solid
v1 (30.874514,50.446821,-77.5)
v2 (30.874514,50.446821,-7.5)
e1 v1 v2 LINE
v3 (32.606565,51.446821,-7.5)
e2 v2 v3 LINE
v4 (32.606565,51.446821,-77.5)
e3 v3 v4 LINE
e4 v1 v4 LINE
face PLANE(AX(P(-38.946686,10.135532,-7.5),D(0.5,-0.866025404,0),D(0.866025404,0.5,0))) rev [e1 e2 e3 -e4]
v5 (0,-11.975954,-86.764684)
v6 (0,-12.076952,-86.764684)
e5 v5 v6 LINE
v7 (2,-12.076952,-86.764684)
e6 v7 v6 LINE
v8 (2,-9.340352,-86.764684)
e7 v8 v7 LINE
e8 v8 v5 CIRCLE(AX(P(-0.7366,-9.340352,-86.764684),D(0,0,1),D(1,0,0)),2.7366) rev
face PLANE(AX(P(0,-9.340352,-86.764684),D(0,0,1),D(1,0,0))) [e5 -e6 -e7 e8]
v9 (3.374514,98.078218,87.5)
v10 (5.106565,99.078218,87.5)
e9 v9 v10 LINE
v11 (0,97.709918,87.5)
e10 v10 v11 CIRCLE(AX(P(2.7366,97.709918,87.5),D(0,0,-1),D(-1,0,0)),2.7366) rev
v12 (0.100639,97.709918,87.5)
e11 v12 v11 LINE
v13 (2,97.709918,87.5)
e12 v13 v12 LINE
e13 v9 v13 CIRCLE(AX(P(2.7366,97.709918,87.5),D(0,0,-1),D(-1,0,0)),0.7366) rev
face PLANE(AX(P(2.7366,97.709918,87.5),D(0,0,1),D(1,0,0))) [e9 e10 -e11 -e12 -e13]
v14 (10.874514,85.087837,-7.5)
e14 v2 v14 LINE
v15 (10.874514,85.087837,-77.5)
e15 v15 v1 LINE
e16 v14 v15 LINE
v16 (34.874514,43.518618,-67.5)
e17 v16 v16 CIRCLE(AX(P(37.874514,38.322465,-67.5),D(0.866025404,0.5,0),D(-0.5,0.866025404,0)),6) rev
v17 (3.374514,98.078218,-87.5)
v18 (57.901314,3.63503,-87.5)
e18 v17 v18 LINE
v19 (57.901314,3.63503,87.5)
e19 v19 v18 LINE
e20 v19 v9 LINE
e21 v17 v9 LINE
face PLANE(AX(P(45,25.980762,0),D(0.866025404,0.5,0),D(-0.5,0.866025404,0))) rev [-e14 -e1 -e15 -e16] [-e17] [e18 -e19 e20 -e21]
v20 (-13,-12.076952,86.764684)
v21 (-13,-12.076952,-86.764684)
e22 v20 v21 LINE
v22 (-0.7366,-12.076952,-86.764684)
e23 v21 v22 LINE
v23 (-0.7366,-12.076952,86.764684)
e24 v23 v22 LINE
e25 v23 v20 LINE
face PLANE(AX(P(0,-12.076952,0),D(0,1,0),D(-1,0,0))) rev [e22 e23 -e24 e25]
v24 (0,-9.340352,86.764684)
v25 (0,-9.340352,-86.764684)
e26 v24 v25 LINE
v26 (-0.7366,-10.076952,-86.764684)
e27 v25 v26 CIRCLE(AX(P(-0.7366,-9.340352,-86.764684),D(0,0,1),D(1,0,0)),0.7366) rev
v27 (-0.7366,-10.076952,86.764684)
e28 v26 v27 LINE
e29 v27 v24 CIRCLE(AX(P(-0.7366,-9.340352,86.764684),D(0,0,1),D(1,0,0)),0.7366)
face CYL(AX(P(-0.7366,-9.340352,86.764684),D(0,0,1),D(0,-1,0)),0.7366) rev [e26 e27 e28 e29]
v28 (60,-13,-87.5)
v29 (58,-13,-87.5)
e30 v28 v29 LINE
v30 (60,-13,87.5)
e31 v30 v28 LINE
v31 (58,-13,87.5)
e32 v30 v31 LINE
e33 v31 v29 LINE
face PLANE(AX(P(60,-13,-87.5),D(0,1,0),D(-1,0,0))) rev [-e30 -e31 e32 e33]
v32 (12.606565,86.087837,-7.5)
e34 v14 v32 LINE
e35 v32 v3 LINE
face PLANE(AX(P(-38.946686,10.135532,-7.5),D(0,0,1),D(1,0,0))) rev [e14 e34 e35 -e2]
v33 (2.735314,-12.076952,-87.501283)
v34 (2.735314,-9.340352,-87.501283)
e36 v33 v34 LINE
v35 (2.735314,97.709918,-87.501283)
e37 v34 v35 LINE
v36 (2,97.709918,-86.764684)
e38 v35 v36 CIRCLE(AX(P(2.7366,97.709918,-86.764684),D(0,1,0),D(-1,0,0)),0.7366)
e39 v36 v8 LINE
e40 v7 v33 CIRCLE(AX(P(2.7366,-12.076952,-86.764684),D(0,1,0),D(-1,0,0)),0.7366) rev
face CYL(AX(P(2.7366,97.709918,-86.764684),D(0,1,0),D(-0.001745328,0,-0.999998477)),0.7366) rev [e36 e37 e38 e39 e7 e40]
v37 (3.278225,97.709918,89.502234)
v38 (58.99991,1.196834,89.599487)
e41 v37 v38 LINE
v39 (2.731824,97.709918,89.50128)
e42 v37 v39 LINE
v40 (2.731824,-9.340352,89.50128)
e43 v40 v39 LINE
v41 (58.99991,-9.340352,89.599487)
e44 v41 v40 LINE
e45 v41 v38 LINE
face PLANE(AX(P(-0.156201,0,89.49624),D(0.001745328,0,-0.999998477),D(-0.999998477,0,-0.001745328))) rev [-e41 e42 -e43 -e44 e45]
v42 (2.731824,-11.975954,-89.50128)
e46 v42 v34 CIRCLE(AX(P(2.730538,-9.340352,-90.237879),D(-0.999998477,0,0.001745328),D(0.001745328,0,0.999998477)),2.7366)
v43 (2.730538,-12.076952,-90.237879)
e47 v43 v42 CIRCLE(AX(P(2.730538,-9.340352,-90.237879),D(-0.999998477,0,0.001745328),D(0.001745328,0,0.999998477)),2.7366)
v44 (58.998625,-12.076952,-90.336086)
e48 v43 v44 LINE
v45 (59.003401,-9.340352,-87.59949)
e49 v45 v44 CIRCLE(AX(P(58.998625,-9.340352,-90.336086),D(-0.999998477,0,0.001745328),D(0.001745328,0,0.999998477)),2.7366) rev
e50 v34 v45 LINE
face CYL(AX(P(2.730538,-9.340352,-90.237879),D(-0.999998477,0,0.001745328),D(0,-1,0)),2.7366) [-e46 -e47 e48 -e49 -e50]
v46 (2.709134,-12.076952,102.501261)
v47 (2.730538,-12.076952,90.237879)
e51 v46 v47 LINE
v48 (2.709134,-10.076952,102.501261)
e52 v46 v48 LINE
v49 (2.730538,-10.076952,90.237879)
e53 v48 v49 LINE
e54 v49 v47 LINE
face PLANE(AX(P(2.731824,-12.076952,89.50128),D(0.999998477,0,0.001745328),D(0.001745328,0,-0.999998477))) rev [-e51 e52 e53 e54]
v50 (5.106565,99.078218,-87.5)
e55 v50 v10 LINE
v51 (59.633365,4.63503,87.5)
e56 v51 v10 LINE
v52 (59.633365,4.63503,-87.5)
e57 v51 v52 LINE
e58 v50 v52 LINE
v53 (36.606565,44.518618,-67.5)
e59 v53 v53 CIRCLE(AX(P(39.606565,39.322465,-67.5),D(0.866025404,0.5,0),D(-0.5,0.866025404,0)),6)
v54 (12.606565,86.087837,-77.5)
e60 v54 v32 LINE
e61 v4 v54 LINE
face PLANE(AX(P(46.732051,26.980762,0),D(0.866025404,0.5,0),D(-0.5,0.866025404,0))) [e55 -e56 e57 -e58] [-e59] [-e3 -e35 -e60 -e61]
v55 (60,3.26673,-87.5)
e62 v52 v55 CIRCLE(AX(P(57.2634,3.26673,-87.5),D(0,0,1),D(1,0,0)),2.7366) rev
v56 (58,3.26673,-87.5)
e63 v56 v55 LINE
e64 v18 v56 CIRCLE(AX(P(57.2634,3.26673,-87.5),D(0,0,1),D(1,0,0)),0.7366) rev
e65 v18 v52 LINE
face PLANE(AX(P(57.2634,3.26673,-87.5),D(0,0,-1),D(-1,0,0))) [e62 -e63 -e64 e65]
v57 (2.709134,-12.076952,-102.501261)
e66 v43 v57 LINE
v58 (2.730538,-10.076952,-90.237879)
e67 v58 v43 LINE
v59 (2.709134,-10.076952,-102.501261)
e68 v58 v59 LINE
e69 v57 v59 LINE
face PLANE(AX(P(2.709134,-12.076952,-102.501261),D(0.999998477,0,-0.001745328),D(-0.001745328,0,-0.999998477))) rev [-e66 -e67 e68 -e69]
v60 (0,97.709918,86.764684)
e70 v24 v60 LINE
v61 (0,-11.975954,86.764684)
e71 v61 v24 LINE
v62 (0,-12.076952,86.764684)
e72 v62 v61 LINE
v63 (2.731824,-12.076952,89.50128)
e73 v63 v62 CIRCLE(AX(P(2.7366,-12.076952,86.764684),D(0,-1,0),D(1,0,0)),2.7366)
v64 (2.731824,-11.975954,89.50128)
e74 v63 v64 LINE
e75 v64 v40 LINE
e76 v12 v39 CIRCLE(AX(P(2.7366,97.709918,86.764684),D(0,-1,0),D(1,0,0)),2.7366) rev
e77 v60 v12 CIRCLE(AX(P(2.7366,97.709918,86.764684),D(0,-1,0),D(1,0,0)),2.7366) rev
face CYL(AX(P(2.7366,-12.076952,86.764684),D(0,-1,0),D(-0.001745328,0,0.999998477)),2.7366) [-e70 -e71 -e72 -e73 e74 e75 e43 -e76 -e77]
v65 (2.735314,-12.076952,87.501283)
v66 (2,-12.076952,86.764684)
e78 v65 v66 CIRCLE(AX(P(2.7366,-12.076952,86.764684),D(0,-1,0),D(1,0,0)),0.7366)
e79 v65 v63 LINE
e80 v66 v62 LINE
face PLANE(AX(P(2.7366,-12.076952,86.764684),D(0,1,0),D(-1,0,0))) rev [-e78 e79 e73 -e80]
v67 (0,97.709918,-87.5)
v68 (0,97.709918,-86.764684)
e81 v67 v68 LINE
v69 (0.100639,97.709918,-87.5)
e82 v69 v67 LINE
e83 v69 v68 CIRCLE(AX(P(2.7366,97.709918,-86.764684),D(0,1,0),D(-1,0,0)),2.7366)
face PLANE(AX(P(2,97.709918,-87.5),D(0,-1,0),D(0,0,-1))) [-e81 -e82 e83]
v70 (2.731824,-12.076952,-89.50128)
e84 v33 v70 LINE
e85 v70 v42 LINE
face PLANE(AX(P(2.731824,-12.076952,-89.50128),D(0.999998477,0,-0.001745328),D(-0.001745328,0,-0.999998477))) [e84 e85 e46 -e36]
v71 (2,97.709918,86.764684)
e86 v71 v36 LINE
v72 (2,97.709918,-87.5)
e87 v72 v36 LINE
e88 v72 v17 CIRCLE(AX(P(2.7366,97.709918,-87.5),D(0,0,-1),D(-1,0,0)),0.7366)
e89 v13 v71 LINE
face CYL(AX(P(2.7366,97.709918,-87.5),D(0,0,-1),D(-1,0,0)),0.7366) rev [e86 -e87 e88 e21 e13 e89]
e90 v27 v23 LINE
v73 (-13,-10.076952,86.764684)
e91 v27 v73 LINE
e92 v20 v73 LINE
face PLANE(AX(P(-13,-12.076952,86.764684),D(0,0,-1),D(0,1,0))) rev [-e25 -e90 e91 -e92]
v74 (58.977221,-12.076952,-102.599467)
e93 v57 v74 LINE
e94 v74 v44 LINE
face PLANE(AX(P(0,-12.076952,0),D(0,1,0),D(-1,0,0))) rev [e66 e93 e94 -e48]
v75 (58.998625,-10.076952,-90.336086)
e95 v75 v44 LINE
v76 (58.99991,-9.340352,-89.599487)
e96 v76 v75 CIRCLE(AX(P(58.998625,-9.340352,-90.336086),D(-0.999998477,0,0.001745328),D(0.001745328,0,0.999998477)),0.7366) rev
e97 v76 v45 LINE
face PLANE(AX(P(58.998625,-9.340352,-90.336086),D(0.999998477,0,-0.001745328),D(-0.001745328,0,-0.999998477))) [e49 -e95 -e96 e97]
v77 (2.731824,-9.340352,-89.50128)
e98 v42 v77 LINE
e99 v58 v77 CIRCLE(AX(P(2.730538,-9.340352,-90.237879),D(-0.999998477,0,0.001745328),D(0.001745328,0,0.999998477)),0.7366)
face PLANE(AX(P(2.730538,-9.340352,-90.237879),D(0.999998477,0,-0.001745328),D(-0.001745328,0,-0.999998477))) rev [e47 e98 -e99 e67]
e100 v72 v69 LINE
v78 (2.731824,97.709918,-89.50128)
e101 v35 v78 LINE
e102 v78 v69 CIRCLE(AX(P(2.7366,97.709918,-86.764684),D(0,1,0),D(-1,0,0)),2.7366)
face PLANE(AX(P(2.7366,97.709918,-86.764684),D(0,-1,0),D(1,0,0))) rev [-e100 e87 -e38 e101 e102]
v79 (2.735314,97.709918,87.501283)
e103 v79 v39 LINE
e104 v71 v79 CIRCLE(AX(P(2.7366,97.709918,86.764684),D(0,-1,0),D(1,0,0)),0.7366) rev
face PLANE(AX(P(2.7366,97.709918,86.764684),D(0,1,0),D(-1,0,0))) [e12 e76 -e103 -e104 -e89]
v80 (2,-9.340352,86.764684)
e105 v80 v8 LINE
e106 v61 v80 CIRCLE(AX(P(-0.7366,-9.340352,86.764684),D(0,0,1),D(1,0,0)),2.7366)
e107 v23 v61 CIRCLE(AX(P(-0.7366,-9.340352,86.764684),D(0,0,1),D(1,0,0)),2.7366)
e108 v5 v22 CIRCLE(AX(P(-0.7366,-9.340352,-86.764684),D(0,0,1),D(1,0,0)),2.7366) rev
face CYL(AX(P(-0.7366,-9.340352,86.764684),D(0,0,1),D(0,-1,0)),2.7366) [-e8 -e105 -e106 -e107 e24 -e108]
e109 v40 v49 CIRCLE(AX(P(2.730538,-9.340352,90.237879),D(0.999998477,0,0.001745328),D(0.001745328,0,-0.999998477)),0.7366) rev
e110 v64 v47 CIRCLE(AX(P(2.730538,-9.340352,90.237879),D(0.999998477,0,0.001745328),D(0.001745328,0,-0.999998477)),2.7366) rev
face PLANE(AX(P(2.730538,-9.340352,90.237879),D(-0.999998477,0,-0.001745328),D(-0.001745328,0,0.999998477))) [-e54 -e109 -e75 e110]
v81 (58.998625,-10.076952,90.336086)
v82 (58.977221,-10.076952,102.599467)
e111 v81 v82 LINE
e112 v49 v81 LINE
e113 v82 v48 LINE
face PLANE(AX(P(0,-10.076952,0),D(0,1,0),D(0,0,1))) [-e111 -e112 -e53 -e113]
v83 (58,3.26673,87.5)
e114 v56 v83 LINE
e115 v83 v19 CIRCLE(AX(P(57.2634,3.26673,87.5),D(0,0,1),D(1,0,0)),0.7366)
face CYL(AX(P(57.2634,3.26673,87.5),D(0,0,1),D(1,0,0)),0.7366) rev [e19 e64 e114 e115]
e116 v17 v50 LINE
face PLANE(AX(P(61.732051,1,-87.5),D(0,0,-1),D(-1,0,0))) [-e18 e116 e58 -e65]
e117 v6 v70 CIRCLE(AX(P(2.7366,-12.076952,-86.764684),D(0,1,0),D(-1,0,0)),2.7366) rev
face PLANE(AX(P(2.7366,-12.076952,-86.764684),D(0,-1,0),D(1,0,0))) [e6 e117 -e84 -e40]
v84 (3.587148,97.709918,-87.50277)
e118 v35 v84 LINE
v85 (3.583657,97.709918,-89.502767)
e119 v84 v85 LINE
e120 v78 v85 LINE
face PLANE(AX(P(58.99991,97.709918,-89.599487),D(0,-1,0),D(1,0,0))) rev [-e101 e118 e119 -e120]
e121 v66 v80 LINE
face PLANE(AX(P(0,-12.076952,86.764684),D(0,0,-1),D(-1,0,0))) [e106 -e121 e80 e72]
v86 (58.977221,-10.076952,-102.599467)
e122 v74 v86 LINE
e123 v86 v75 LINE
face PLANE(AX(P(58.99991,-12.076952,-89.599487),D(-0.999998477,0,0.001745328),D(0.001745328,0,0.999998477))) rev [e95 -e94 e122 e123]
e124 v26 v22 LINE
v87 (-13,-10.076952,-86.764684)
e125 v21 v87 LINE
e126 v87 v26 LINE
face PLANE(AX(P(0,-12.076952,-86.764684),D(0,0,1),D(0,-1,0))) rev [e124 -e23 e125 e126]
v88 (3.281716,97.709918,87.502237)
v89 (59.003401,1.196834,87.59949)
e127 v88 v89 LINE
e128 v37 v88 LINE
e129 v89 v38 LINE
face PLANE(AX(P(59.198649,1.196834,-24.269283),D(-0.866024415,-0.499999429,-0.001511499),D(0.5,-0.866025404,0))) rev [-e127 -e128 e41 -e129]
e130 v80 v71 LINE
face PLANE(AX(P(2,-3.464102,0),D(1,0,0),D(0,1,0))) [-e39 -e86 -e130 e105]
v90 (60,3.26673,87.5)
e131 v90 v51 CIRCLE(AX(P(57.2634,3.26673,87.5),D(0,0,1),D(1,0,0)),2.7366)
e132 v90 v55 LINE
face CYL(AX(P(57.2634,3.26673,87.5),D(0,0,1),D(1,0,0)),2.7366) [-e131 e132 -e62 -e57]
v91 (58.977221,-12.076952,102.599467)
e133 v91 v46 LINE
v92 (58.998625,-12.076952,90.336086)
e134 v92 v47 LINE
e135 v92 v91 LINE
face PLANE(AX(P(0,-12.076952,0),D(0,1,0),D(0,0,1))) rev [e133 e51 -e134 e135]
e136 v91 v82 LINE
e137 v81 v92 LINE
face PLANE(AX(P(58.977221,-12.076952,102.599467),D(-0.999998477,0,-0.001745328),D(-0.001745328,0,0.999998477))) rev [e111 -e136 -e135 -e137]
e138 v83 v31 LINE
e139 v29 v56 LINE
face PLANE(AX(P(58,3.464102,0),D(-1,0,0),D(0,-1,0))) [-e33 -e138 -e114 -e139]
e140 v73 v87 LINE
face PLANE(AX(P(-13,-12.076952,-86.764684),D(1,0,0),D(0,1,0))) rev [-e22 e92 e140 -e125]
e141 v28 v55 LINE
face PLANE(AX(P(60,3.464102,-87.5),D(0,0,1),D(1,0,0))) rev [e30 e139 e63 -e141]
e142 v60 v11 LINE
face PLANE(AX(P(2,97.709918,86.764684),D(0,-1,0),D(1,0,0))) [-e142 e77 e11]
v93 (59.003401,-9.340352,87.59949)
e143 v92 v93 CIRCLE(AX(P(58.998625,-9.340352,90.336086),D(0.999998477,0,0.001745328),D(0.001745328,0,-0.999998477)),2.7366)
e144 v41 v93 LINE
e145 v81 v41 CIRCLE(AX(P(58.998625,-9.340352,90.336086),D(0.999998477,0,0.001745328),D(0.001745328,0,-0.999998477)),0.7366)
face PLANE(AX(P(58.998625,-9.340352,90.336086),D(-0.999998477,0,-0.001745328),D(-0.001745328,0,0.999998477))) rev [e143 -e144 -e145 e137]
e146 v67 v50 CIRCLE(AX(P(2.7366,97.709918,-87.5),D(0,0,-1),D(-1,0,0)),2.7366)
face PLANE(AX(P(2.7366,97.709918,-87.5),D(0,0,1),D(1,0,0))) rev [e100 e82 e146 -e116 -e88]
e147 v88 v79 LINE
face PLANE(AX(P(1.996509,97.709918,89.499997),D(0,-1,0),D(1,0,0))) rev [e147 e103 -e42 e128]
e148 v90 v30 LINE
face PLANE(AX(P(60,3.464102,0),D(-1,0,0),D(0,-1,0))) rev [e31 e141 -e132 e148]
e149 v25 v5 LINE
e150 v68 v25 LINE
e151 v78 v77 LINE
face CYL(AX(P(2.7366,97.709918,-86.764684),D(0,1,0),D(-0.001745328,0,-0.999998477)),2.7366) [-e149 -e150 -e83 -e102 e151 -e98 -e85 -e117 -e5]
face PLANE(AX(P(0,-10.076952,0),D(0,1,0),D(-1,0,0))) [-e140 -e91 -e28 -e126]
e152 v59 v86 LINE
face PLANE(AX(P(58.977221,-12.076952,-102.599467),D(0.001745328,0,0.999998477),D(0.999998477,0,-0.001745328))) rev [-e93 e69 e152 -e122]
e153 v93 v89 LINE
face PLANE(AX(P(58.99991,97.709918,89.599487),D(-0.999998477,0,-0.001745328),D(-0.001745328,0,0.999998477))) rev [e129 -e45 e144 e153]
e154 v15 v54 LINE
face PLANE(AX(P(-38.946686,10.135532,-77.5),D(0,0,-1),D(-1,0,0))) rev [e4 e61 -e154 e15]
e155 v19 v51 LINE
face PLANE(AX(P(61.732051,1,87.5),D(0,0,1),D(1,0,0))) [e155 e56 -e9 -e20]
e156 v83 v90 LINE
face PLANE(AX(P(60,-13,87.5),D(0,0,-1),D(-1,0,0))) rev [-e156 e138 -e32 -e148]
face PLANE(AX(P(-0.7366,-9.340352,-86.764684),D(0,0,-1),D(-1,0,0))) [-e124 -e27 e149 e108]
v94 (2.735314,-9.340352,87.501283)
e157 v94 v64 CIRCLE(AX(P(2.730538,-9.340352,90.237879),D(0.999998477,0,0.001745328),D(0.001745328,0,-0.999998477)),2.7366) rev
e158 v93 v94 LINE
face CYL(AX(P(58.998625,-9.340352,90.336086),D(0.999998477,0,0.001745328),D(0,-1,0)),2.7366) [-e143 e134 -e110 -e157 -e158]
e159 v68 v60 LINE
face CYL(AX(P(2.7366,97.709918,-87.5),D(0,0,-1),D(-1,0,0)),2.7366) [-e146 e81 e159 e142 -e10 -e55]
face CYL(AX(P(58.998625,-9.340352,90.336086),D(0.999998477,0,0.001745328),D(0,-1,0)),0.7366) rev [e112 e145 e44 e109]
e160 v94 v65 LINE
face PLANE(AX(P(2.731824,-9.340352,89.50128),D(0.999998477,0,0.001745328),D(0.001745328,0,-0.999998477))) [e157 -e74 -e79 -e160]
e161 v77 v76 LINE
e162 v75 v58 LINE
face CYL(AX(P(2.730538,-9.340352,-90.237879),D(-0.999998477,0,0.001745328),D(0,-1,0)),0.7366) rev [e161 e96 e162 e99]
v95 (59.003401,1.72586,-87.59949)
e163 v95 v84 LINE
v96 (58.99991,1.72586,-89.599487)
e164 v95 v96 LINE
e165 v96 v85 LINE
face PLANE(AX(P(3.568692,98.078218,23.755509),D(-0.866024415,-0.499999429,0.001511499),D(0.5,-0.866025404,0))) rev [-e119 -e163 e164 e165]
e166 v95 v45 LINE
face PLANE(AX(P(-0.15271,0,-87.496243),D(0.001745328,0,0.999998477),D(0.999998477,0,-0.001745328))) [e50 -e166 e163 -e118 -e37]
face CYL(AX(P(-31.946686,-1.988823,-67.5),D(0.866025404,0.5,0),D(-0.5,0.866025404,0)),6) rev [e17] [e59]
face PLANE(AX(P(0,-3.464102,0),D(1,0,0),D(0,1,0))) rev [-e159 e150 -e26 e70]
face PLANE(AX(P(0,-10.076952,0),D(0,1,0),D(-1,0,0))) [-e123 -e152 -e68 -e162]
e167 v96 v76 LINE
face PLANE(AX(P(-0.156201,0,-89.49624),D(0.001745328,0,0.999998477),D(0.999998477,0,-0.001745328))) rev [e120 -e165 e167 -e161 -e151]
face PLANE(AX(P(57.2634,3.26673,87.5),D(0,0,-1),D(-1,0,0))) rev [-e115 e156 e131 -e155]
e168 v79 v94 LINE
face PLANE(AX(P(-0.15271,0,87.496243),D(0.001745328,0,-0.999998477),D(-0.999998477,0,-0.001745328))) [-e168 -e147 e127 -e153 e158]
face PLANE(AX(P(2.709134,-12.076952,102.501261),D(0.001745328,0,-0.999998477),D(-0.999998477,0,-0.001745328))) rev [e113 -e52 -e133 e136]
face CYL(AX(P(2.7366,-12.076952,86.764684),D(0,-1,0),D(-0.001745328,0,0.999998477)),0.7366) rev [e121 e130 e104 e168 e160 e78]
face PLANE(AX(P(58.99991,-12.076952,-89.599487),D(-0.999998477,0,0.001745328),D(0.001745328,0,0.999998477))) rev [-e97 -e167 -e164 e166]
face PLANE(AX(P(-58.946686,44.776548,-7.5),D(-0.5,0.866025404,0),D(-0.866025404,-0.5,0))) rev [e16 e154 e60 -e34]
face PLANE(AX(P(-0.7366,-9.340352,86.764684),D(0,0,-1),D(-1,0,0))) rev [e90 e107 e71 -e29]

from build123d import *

# Parameters (mm, degrees)
CROQUIS3_W                         = 120
CROQUIS3_H                         = 175
BRIDA_BASE1_DEPTH                  = 2
BRIDA_START                        = -87.5
BRIDA_DE_ARISTA1_DEPTH             = 175
BRIDA_DE_ARISTA1_2_DEPTH           = 175
BRIDA_DE_ARISTA2_DEPTH             = 175
BRIDA_DE_ARISTA2_2_DEPTH           = 175
BRIDA_DE_ARISTA3_STRIP_CUT_DEPTH   = 109.78686976
BRIDA_DE_ARISTA3_STRIP_CUT_2_DEPTH = 109.78686976
BRIDA_DE_ARISTA3_DEPTH             = 109.78686976
BRIDA_DE_ARISTA3_BEND_DEPTH        = 109.78686976
CORTAR_EXTRUIR5_DEPTH              = 2
CORTAR_EXTRUIR6_DEPTH              = 2
BRIDA_DE_ARISTA4_STRIP_W           = 9.4732
BRIDA_DE_ARISTA4_STRIP_H           = 2
BRIDA_DE_ARISTA4_STRIP_CUT_DEPTH   = 56.268172105
BRIDA_DE_ARISTA4_STRIP_2_W         = 9.4732
BRIDA_DE_ARISTA4_STRIP_2_H         = 2
BRIDA_DE_ARISTA4_STRIP_CUT_2_DEPTH = 173.529368978
BRIDA_DE_ARISTA4_STRIP_3_W         = 9.4732
BRIDA_DE_ARISTA4_STRIP_3_H         = 2
BRIDA_DE_ARISTA4_STRIP_CUT_3_DEPTH = 56.268172105
BRIDA_DE_ARISTA4_DEPTH             = 56.268172105
BRIDA_DE_ARISTA4_BEND_DEPTH        = 173.529368978
BRIDA_DE_ARISTA4_BEND_2_DEPTH      = 56.268172105
CROQUIS37_R                        = 6
CROQUIS37_W                        = 70
CROQUIS37_H                        = 40
CORTAR_EXTRUIR7_DEPTH              = 2


# Read off the part's stored shape, not the designer's step: Brida de arista1, Brida de arista2
# Sheet-metal steps are written as plain solids
with BuildPart() as part:
    # Croquis3 → Brida base1 (new body)
    with BuildSketch(Plane(origin=(45, 25.980762114, 0), x_dir=(0.5000000000000044, -0.8660254037844362, 0), z_dir=(-0.8660254037844362, -0.5000000000000044, 0))):
        with Locations((-30, 0)):
            Rectangle(CROQUIS3_W, CROQUIS3_H)
    extrude(amount=-BRIDA_BASE1_DEPTH)

    # Brida de arista1 outline → Brida de arista1 (cut)
    with BuildSketch(Plane.XY.offset(BRIDA_START)):
        with BuildLine():
            Line((0, 103.923048454), (2.056713114, 100.360716845))
            ThreePointArc((2.056713114, 100.360716845), (3.797397716, 100.232553298), (5.10656512, 99.078218214))
            Line((5.10656512, 99.078218214), (1.732050808, 104.923048454))
            Line((1.732050808, 104.923048454), (0, 103.923048454))
        make_face()
    extrude(amount=BRIDA_DE_ARISTA1_DEPTH, mode=Mode.SUBTRACT)

    # Brida de arista1 2 outline → Brida de arista1 2 (add)
    with BuildSketch(Plane.XY.offset(BRIDA_START)):
        with BuildLine():
            ThreePointArc((2.056713114, 100.360716845), (0.574476274, 99.387476127), (0, 97.709918214))
            Line((0, 97.709918214), (0, -12.076951546))
            Line((0, -12.076951546), (2, -12.076951546))
            Line((2, -12.076951546), (2, 97.709918214))
            ThreePointArc((2, 97.709918214), (2.545953891, 98.421419178), (3.374514312, 98.078218214))
            Line((3.374514312, 98.078218214), (2.056713114, 100.360716845))
        make_face()
    extrude(amount=BRIDA_DE_ARISTA1_2_DEPTH)

    # Brida de arista2 outline → Brida de arista2 (cut)
    with BuildSketch(Plane.XY.offset(BRIDA_START)):
        with BuildLine():
            ThreePointArc((59.63336512, 4.63503024), (59.906752616, 3.975014439), (60, 3.26673024))
            Line((60, 3.26673024), (60, 0))
            Line((60, 0), (61.732050808, 1))
            Line((61.732050808, 1), (59.63336512, 4.63503024))
        make_face()
    extrude(amount=BRIDA_DE_ARISTA2_DEPTH, mode=Mode.SUBTRACT)

    # Brida de arista2 2 outline → Brida de arista2 2 (add)
    with BuildSketch(Plane.XY.offset(BRIDA_START)):
        with BuildLine():
            Line((60, -13), (60, 0))
            Line((60, 0), (57.901314312, 3.63503024))
            ThreePointArc((57.901314312, 3.63503024), (57.974900964, 3.457376349), (58, 3.26673024))
            Line((58, 3.26673024), (58, -13))
            Line((58, -13), (60, -13))
        make_face()
    extrude(amount=BRIDA_DE_ARISTA2_2_DEPTH)

    # Brida de arista3 strip (across the edge) → Brida de arista3 strip cut (cut)
    with BuildSketch(Plane(origin=(2, -12.076951546, -87.5), x_dir=(0.0017453283659016917, 0, 0.9999984769132877), z_dir=(0, 1, 0))):
        Polygon((-8.741361837, -1.984746476), (0.731823734, -2.001280321), (0.735314391, -0.001283367), (-8.73787118, 0.015250478), align=None)
    extrude(amount=BRIDA_DE_ARISTA3_STRIP_CUT_DEPTH, mode=Mode.SUBTRACT)

    # Brida de arista3 strip 2 (across the edge) → Brida de arista3 strip cut 2 (cut)
    with BuildSketch(Plane(origin=(2, 97.709918214, 87.5), x_dir=(0.0017453283659016917, 0, -0.9999984769132877), z_dir=(0, -1, 0))):
        Polygon((-8.741361837, -1.984746476), (0.731823734, -2.001280321), (0.735314391, -0.001283367), (-8.73787118, 0.015250478), align=None)
    extrude(amount=BRIDA_DE_ARISTA3_STRIP_CUT_2_DEPTH, mode=Mode.SUBTRACT)

    # Brida de arista3 section (across the edge) → Brida de arista3 (add)
    with BuildSketch(Plane(origin=(2, -12.076951546, -87.5), x_dir=(0.0017453283659016917, 0, 0.9999984769132877), z_dir=(0, 1, 0))):
        with BuildLine():
            Line((-2, 0.735315511), (-2, 57.003487616))
            Line((-2, 57.003487616), (0, 57.003487616))
            Line((0, 57.003487616), (0, 0.735315511))
            ThreePointArc((0, 0.735315511), (0.215290812, 0.214915386), (0.735314391, -0.001283367))
            Line((0.735314391, -0.001283367), (0.731823734, -2.001280321))
            ThreePointArc((0.731823734, -2.001280321), (-1.200156346, -1.198063504), (-2, 0.735315511))
        make_face()
    extrude(amount=BRIDA_DE_ARISTA3_DEPTH)

    # Brida de arista3 section 2 (across the edge) → Brida de arista3 bend (add)
    with BuildSketch(Plane(origin=(2, 97.709918214, 87.5), x_dir=(0.0017453283659016917, 0, -0.9999984769132877), z_dir=(0, -1, 0))):
        with BuildLine():
            Line((-2, 0.735315511), (-2, 57.003487616))
            Line((-2, 57.003487616), (0, 57.003487616))
            Line((0, 57.003487616), (0, 0.735315511))
            ThreePointArc((0, 0.735315511), (0.215290812, 0.214915386), (0.735314391, -0.001283367))
            Line((0.735314391, -0.001283367), (0.731823734, -2.001280321))
            ThreePointArc((0.731823734, -2.001280321), (-1.200156346, -1.198063504), (-2, 0.735315511))
        make_face()
    extrude(amount=BRIDA_DE_ARISTA3_BEND_DEPTH)

    # Croquis23 → Cortar-Extruir5 (cut)
    with BuildSketch(Plane(origin=(-0.156200564, 0, 89.496239762), x_dir=(0.9999984769132877, 0, 0.0017453283659016985), z_dir=(-0.0017453283659016987, 0, 0.9999984769132878))):
        Polygon((3.221792941, 98.078218214), (57.748509892, 3.63503024), (59.156200802, 1.196834349), (59.156200802, 97.709918214), align=None)
    extrude(amount=-CORTAR_EXTRUIR5_DEPTH, mode=Mode.SUBTRACT)

    # Croquis24 → Cortar-Extruir6 (cut)
    with BuildSketch(Plane(origin=(-0.156200564, 0, -89.496239762), x_dir=(-0.9999984769132877, 0, 0.001745328365901773), z_dir=(-0.0017453283659017733, 0, -0.9999984769132878))):
        Polygon((-3.527225405, 98.078218214), (-58.053942356, 3.63503024), (-59.156200802, 1.725859701), (-59.156200802, 97.709918214), align=None)
    extrude(amount=-CORTAR_EXTRUIR6_DEPTH, mode=Mode.SUBTRACT)

    # Brida de arista4 strip (across the edge) → Brida de arista4 strip cut (cut)
    with BuildSketch(Plane(origin=(58.999910138, -12.076951546, -89.599486758), x_dir=(0, 1, 0), z_dir=(-0.9999984769132877, -4.100332633432973e-15, 0.00174532836590182))):
        with Locations((-2, -1)):
            Rectangle(BRIDA_DE_ARISTA4_STRIP_W, BRIDA_DE_ARISTA4_STRIP_H)
    extrude(amount=BRIDA_DE_ARISTA4_STRIP_CUT_DEPTH, mode=Mode.SUBTRACT)

    # Brida de arista4 strip 2 (across the edge) → Brida de arista4 strip cut 2 (cut)
    with BuildSketch(Plane(origin=(0, -12.076951546, -86.764684489), x_dir=(0, 1, 0), z_dir=(0, 0, 1))):
        with Locations((-2, -1)):
            Rectangle(BRIDA_DE_ARISTA4_STRIP_2_W, BRIDA_DE_ARISTA4_STRIP_2_H)
    extrude(amount=BRIDA_DE_ARISTA4_STRIP_CUT_2_DEPTH, mode=Mode.SUBTRACT)

    # Brida de arista4 strip 3 (across the edge) → Brida de arista4 strip cut 3 (cut)
    with BuildSketch(Plane(origin=(2.731823734, -12.076951546, 89.501280321), x_dir=(0, 1, 0), z_dir=(0.9999984769132877, 2.0039219637078435e-15, 0.0017453283659018195))):
        with Locations((-2, -1)):
            Rectangle(BRIDA_DE_ARISTA4_STRIP_3_W, BRIDA_DE_ARISTA4_STRIP_3_H)
    extrude(amount=BRIDA_DE_ARISTA4_STRIP_CUT_3_DEPTH, mode=Mode.SUBTRACT)

    # Brida de arista4 section (across the edge) → Brida de arista4 (add)
    with BuildSketch(Plane(origin=(58.999910138, -12.076951546, -89.599486758), x_dir=(0, 1, 0), z_dir=(-0.9999984769132877, -4.100332633432973e-15, 0.00174532836590182))):
        with BuildLine():
            Line((0, 0.7366), (0, 13))
            Line((0, 13), (2, 13))
            Line((2, 13), (2, 0.7366))
            ThreePointArc((2, 0.7366), (2.215745145, 0.215745145), (2.7366, 0))
            Line((2.7366, 0), (2.7366, -2))
            ThreePointArc((2.7366, -2), (0.801531583, -1.198468417), (0, 0.7366))
        make_face()
    extrude(amount=BRIDA_DE_ARISTA4_DEPTH)

    # Brida de arista4 section 2 (across the edge) → Brida de arista4 bend (add)
    with BuildSketch(Plane(origin=(0, -12.076951546, -86.764684489), x_dir=(0, 1, 0), z_dir=(0, 0, 1))):
        with BuildLine():
            Line((0, 0.7366), (0, 13))
            Line((0, 13), (2, 13))
            Line((2, 13), (2, 0.7366))
            ThreePointArc((2, 0.7366), (2.215745145, 0.215745145), (2.7366, 0))
            Line((2.7366, 0), (2.7366, -2))
            ThreePointArc((2.7366, -2), (0.801531583, -1.198468417), (0, 0.7366))
        make_face()
    extrude(amount=BRIDA_DE_ARISTA4_BEND_DEPTH)

    # Brida de arista4 section 3 (across the edge) → Brida de arista4 bend 2 (add)
    with BuildSketch(Plane(origin=(2.731823734, -12.076951546, 89.501280321), x_dir=(0, 1, 0), z_dir=(0.9999984769132877, 2.0039219637078435e-15, 0.0017453283659018195))):
        with BuildLine():
            Line((0, 0.7366), (0, 13))
            Line((0, 13), (2, 13))
            Line((2, 13), (2, 0.7366))
            ThreePointArc((2, 0.7366), (2.215745145, 0.215745145), (2.7366, 0))
            Line((2.7366, 0), (2.7366, -2))
            ThreePointArc((2.7366, -2), (0.801531583, -1.198468417), (0, 0.7366))
        make_face()
    extrude(amount=BRIDA_DE_ARISTA4_BEND_2_DEPTH)

    # Croquis37 → Cortar-Extruir7 (cut)
    with BuildSketch(Plane(origin=(46.732050808, 26.980762114, 0), x_dir=(0, 0, -1), z_dir=(0.866025403784436, 0.5000000000000047, 0))):
        with Locations(Location((67.5, 14.250971375, 0), (0, 0, 90))):
            Circle(CROQUIS37_R)
        with Locations((42.5, 48.250971375)):
            Rectangle(CROQUIS37_W, CROQUIS37_H)
    extrude(amount=-CORTAR_EXTRUIR7_DEPTH, mode=Mode.SUBTRACT)


solid = part.part
